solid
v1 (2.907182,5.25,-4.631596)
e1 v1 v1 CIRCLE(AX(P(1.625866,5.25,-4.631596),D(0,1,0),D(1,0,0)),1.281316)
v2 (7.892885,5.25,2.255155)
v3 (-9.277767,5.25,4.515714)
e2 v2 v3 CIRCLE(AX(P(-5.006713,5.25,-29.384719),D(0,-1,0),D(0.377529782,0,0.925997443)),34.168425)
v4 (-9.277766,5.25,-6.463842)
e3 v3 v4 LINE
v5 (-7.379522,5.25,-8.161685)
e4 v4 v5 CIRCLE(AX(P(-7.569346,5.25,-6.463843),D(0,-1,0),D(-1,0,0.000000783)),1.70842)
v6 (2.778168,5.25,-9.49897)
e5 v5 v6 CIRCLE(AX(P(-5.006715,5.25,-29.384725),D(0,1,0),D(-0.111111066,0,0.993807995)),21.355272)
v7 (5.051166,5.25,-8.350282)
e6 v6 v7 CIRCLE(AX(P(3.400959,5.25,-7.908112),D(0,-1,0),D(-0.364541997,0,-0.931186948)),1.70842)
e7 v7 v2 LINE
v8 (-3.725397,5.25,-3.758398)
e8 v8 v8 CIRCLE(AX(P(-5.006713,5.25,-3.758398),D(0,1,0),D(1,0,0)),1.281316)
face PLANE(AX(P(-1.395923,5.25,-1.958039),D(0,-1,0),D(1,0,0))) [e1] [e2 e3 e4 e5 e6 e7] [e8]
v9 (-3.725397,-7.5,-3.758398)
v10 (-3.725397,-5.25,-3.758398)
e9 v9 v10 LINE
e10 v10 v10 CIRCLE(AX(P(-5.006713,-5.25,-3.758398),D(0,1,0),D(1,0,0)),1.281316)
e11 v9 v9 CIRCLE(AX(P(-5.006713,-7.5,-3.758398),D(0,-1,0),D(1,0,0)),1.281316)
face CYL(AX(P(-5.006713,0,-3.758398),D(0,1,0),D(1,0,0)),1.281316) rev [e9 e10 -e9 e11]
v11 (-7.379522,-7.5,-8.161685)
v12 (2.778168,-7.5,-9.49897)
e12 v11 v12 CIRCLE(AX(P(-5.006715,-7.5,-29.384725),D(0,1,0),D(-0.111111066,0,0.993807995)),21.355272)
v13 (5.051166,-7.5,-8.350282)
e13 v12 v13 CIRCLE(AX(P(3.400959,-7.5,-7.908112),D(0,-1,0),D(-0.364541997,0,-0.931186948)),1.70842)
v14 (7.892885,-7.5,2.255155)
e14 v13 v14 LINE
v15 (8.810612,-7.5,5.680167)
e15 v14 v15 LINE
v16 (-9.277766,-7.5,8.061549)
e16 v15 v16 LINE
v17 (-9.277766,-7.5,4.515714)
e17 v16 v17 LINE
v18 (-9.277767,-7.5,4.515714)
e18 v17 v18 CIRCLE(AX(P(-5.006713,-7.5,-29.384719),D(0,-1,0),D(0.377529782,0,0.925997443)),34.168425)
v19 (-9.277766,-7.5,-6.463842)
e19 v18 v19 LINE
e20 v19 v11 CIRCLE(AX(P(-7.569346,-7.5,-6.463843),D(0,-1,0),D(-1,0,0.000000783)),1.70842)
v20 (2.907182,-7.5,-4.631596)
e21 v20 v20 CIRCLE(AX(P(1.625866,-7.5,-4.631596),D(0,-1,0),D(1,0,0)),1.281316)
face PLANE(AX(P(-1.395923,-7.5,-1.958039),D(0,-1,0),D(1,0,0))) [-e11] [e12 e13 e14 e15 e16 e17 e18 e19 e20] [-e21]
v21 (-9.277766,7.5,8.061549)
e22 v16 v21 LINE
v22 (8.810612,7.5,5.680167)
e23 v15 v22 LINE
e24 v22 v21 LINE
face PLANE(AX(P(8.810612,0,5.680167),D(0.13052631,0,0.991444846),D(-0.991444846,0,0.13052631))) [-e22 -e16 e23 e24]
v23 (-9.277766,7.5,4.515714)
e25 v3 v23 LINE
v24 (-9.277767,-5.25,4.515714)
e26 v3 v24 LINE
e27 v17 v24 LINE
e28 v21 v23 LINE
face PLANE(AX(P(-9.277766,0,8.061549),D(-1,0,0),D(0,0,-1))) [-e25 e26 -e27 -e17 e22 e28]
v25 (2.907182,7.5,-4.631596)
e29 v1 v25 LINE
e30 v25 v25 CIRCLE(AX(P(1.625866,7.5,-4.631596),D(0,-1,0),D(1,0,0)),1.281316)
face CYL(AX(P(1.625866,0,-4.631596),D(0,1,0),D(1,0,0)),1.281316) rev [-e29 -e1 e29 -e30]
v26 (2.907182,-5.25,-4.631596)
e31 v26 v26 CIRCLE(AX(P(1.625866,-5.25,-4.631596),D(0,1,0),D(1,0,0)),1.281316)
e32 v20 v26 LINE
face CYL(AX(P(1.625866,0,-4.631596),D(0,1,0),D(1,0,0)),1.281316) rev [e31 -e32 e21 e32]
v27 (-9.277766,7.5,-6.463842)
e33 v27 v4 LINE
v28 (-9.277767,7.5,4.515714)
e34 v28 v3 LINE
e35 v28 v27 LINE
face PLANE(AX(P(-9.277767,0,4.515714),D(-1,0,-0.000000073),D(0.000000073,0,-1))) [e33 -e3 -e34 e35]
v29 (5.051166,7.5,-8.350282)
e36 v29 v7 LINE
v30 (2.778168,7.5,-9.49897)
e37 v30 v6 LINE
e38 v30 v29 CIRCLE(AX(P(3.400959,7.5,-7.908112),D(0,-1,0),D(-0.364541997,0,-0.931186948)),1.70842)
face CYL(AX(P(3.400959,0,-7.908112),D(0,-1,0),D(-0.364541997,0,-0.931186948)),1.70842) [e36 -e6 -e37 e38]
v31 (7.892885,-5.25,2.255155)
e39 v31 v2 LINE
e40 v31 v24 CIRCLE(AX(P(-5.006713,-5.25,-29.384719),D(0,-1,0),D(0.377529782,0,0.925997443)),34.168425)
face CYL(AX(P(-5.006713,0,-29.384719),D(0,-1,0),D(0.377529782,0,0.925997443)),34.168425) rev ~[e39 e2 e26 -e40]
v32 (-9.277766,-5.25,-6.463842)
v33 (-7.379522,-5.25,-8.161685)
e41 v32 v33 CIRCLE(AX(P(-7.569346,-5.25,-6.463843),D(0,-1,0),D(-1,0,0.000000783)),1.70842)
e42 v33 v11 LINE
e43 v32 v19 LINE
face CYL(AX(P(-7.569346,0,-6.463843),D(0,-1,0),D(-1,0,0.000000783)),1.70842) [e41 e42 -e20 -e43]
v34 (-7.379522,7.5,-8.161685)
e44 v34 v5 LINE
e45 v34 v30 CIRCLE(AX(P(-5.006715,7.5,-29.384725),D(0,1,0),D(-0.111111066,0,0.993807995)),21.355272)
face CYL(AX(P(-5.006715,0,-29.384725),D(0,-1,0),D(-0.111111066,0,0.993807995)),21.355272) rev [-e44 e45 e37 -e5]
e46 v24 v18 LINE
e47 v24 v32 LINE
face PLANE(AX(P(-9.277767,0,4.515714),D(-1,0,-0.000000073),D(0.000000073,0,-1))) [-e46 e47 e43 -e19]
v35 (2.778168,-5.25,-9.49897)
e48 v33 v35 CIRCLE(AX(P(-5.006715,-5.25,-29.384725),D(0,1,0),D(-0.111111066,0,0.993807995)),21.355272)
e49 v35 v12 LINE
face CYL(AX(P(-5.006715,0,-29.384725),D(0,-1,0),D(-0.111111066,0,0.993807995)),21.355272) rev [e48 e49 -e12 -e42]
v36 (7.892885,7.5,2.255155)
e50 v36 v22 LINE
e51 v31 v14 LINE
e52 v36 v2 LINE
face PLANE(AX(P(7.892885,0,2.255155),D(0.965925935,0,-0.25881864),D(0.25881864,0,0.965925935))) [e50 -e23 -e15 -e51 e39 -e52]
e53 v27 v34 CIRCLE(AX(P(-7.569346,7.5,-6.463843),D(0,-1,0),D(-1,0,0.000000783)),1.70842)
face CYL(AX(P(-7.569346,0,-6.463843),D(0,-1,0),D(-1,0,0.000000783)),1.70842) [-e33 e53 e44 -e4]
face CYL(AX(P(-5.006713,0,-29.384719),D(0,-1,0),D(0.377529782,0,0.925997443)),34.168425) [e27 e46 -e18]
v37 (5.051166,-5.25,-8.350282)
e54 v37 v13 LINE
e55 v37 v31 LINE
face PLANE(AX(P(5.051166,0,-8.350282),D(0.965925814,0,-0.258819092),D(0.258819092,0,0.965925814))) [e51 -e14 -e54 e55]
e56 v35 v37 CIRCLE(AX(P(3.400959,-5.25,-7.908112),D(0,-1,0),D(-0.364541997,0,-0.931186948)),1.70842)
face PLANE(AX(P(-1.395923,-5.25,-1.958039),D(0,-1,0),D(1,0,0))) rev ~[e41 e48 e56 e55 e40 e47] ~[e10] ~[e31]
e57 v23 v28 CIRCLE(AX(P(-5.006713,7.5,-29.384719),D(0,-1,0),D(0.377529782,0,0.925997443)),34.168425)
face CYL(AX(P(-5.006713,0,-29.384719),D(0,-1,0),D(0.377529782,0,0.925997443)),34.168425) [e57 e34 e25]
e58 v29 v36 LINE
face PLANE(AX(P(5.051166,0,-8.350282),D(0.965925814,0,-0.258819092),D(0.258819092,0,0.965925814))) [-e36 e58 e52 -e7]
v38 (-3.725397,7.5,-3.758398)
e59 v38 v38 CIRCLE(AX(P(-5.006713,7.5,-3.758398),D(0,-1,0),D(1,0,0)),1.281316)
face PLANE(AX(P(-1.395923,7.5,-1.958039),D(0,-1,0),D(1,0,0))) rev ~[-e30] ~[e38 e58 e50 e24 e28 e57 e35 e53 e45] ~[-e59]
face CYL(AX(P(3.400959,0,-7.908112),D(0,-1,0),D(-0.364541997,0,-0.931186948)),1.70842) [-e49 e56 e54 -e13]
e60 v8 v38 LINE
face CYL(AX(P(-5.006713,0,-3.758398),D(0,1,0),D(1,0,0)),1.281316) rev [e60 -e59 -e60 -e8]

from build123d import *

# Parameters (mm, degrees)
F0_R     = 1.2813159657
F1_DEPTH = 7.5
F2_DEPTH = 5.25


# Not quite as in the source:
# - ends of sketch curves that miss each other by under 0.0002 mm in the source are joined


with BuildPart() as f1:
    # F0 (on Front) → F1 (new body, symmetric)
    with BuildSketch(Plane.XZ):
        with BuildLine():
            ThreePointArc((7.8928847665, 2.2551549829), (-0.5468394213, 4.4913902739), (-9.2777672646, 4.515713911))
            Line((-9.2777672646, 4.515713911), (-9.27776646, -6.4638420574))
            ThreePointArc((-9.27776646, -6.4638420574), (-8.7082936227, -7.7372240383), (-7.3795216285, -8.1616848044))
            ThreePointArc((-7.3795216285, -8.1616848044), (-2.2192897787, -8.212150504), (2.7781677389, -9.4989699664))
            ThreePointArc((2.7781677389, -9.4989699664), (4.1715212346, -9.432884372), (5.0511658084, -8.3502824825))
            Line((5.0511658084, -8.3502824825), (7.8928847665, 2.2551549829))
        make_face()
        with Locations((-5.0067132411, -3.7583980654)):
            Circle(F0_R, mode=Mode.SUBTRACT)
        with Locations((1.6258659514, -4.6315961033)):
            Circle(F0_R, mode=Mode.SUBTRACT)
        with BuildLine():
            Line((8.8106123745, 5.6801667894), (-9.27776646, 8.0615492201))
            Line((-9.27776646, 8.0615492201), (-9.27776646, 4.515713911))
            ThreePointArc((-9.27776646, 4.515713911), (-0.5468394213, 4.4913902739), (7.8928847665, 2.2551549829))
            Line((7.8928847665, 2.2551549829), (8.8106123745, 5.6801667894))
        make_face()
    extrude(amount=F1_DEPTH, both=True)

    # F0 (on Front) → F2 (cut, symmetric)
    with BuildSketch(Plane.XZ):
        with BuildLine():
            ThreePointArc((7.8928847665, 2.2551549829), (-0.5468394213, 4.4913902739), (-9.2777672646, 4.515713911))
            Line((-9.2777672646, 4.515713911), (-9.27776646, -6.4638420574))
            ThreePointArc((-9.27776646, -6.4638420574), (-8.7082936227, -7.7372240383), (-7.3795216285, -8.1616848044))
            ThreePointArc((-7.3795216285, -8.1616848044), (-2.2192897787, -8.212150504), (2.7781677389, -9.4989699664))
            ThreePointArc((2.7781677389, -9.4989699664), (4.1715212346, -9.432884372), (5.0511658084, -8.3502824825))
            Line((5.0511658084, -8.3502824825), (7.8928847665, 2.2551549829))
        make_face()
        with Locations((-5.0067132411, -3.7583980654)):
            Circle(F0_R, mode=Mode.SUBTRACT)
        with Locations((1.6258659514, -4.6315961033)):
            Circle(F0_R, mode=Mode.SUBTRACT)
        with Locations((-5.0067132411, -3.7583980654)):
            Circle(F0_R)
        with Locations((1.6258659514, -4.6315961033)):
            Circle(F0_R)
    extrude(amount=F2_DEPTH, both=True, mode=Mode.SUBTRACT)


solid = f1.part
